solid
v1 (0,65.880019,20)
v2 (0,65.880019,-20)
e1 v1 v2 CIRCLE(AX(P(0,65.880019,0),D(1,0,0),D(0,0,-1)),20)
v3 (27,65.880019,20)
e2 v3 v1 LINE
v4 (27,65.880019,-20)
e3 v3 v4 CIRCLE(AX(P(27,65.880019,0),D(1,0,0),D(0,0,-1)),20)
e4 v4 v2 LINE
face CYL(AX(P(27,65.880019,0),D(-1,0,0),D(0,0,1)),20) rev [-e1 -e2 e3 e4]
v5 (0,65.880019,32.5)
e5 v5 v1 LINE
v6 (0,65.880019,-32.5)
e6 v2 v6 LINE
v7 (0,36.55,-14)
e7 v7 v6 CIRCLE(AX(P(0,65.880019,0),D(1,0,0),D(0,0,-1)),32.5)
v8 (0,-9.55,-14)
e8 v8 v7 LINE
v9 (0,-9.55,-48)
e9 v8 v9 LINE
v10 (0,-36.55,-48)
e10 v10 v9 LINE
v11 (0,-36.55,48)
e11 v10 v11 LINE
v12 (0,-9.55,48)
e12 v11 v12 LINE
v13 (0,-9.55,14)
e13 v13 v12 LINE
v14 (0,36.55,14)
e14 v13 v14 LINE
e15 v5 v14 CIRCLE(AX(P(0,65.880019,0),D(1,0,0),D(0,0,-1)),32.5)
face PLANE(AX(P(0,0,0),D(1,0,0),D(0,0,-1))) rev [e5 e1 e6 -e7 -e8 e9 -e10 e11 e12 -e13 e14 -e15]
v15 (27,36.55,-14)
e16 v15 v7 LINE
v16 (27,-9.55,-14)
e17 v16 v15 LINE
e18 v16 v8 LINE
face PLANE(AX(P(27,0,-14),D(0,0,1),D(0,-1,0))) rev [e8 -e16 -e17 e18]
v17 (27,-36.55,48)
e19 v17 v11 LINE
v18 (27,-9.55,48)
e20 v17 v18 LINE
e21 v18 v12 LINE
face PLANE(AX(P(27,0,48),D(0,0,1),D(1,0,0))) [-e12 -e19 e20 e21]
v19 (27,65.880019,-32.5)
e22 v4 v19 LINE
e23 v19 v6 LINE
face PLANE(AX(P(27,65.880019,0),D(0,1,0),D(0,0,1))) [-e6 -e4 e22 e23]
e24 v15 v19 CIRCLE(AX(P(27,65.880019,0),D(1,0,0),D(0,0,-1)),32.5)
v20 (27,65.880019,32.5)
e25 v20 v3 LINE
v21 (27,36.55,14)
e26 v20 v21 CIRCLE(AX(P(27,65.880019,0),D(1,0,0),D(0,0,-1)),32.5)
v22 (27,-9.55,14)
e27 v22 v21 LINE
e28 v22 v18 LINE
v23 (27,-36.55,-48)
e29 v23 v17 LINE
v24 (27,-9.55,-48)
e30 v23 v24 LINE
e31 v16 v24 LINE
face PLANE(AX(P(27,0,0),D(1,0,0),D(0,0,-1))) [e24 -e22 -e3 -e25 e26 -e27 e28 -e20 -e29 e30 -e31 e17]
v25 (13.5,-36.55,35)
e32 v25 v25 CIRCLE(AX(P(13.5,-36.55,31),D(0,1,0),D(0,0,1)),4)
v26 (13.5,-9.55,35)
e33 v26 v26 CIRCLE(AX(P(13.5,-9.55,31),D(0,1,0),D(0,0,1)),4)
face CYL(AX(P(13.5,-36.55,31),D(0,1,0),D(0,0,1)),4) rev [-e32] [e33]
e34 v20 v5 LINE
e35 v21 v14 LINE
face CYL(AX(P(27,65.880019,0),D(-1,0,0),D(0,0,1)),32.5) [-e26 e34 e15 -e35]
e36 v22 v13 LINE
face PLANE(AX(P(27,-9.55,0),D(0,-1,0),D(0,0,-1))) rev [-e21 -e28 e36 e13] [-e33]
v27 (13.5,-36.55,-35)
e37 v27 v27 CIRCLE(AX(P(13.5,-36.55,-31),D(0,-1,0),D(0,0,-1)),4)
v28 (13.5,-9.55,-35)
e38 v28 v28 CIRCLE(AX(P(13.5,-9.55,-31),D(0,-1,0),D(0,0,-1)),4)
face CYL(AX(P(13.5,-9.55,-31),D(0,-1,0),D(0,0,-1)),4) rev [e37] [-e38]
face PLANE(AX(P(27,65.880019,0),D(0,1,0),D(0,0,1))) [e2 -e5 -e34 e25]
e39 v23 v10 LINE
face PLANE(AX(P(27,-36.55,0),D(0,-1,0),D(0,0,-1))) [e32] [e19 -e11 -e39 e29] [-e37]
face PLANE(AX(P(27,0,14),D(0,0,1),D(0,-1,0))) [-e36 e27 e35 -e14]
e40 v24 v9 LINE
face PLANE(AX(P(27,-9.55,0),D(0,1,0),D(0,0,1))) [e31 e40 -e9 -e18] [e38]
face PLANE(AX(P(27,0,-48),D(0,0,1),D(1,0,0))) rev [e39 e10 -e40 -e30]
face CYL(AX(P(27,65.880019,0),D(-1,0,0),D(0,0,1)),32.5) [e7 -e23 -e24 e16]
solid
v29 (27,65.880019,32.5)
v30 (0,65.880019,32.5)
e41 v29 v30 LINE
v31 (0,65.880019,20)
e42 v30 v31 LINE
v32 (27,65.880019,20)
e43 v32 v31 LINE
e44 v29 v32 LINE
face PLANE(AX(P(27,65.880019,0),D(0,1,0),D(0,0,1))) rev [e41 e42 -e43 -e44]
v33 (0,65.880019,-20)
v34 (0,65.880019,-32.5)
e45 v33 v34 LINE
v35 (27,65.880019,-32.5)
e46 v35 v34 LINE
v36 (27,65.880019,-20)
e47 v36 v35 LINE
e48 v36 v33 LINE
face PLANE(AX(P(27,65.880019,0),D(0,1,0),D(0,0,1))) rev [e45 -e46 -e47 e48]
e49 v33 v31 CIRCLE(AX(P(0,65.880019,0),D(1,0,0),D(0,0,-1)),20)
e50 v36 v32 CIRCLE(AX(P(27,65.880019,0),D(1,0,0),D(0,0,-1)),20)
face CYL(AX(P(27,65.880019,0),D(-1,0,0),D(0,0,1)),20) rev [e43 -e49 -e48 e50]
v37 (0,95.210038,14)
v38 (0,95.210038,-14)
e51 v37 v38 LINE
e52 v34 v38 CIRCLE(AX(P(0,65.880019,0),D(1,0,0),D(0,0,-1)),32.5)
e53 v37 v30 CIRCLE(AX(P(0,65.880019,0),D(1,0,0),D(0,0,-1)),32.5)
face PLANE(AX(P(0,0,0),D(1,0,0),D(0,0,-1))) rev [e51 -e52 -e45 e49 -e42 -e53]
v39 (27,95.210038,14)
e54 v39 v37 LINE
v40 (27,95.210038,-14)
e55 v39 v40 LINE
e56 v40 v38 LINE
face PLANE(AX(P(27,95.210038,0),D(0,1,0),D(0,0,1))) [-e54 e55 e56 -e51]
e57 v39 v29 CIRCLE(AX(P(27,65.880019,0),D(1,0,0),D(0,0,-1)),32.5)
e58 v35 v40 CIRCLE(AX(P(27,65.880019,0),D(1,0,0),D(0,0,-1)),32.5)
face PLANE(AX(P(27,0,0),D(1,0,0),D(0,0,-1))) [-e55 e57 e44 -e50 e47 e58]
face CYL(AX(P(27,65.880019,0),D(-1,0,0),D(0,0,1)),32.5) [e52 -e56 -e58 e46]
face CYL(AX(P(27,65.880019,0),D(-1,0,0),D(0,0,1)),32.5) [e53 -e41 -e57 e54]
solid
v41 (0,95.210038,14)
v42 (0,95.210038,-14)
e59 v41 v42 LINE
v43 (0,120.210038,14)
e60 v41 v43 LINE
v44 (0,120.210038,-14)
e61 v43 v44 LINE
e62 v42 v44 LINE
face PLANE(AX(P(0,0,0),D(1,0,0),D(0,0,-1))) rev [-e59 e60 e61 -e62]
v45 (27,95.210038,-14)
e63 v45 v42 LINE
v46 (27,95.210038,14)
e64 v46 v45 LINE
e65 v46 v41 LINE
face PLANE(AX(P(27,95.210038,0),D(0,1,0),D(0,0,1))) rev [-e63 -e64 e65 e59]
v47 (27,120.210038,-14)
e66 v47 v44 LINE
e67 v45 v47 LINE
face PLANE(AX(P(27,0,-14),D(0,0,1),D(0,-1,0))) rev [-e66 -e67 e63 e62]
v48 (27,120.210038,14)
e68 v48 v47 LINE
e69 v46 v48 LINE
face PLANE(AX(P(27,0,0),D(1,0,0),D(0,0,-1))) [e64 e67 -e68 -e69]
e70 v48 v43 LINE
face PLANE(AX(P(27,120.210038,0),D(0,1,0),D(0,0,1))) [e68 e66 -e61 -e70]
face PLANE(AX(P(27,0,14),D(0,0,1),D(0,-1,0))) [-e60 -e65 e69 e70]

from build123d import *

# Parameters (mm, degrees)
SKETCH2_W              = 34
SKETCH2_H              = 27
SKETCH2_W_2            = 28
SKETCH2_H_2            = 73.1
BOSS_EXTRUDE1_DEPTH    = 27
CUT_EXTRUDE1_DEPTH     = 27
CUT_EXTRUDE2_START     = -36.55
CUT_EXTRUDE2_OUTLINE_R = 4
CUT_EXTRUDE2_DEPTH     = 27
BOSS_EXTRUDE3_DEPTH    = 27
SKETCH2_4_W            = 28
SKETCH2_4_H            = 25
BOSS_EXTRUDE4_DEPTH    = 27


# Read off the part's stored shape, not the designer's step: Cut-Extrude2
with BuildPart() as part:
    # Sketch2 → Boss-Extrude1 (new body)
    with BuildSketch(Plane(origin=(0, 0, 0), x_dir=(0, 0, -1), z_dir=(1, 0, 0))):
        with Locations((-31, -23.05)):
            Rectangle(SKETCH2_W, SKETCH2_H)
        Rectangle(SKETCH2_W_2, SKETCH2_H_2)
        with Locations((31, -23.05)):
            Rectangle(SKETCH2_W, SKETCH2_H)
        with BuildLine():
            ThreePointArc((-32.5, 65.880018752), (-27.488634015, 48.541477868), (-14, 36.55))
            Line((-14, 36.55), (14, 36.55))
            ThreePointArc((14, 36.55), (27.488634015, 48.541477868), (32.5, 65.880018752))
            Line((32.5, 65.880018752), (20, 65.880018752))
            ThreePointArc((20, 65.880018752), (0, 45.880018752), (-20, 65.880018752))
            Line((-20, 65.880018752), (-32.5, 65.880018752))
        make_face()
    extrude(amount=BOSS_EXTRUDE1_DEPTH)

    # Sketch3 → Cut-Extrude1 (cut)
    with BuildSketch(Plane(origin=(0, -9.55, 0), x_dir=(1, 0, 0), z_dir=(0, 1, 0))):
        with BuildLine():
            ThreePointArc((15.987528574, -27.86755661), (10.36755661, -28.512471426), (11.012471426, -34.13244339))
            Line((11.012471426, -34.13244339), (15.987528574, -27.86755661))
        make_face()
        with BuildLine():
            Line((15.987528574, -27.86755661), (11.012471426, -34.13244339))
            ThreePointArc((11.012471426, -34.13244339), (15.239236284, -34.602090664), (17.5, -31))
            ThreePointArc((17.5, -31), (17.102090664, -29.260763716), (15.987528574, -27.86755661))
        make_face()
    extrude(amount=-CUT_EXTRUDE1_DEPTH, mode=Mode.SUBTRACT)

    # Cut-Extrude2 outline → Cut-Extrude2 (cut)
    with BuildSketch(Plane(origin=(0, 0, 0), x_dir=(1, 0, 0), z_dir=(0, 1, 0)).offset(CUT_EXTRUDE2_START)):
        with Locations((13.5, 31)):
            Circle(CUT_EXTRUDE2_OUTLINE_R)
    extrude(amount=CUT_EXTRUDE2_DEPTH, mode=Mode.SUBTRACT)


with BuildPart() as body_2:
    # Sketch2<3> → Boss-Extrude3 (new body)
    with BuildSketch(Plane(origin=(0, 0, 0), x_dir=(0, 0, -1), z_dir=(1, 0, 0))):
        with BuildLine():
            ThreePointArc((-14, 95.210037504), (-27.488634015, 83.218559637), (-32.5, 65.880018752))
            Line((-32.5, 65.880018752), (-20, 65.880018752))
            ThreePointArc((-20, 65.880018752), (0, 85.880018752), (20, 65.880018752))
            Line((20, 65.880018752), (32.5, 65.880018752))
            ThreePointArc((32.5, 65.880018752), (27.488634015, 83.218559637), (14, 95.210037504))
            Line((14, 95.210037504), (-14, 95.210037504))
        make_face()
    extrude(amount=BOSS_EXTRUDE3_DEPTH)


with BuildPart() as body_3:
    # Sketch2<4> → Boss-Extrude4 (new body)
    with BuildSketch(Plane(origin=(0, 0, 0), x_dir=(0, 0, -1), z_dir=(1, 0, 0))):
        with Locations((0, 107.710037504)):
            Rectangle(SKETCH2_4_W, SKETCH2_4_H)
    extrude(amount=BOSS_EXTRUDE4_DEPTH)


solid = Compound([part.part, body_2.part, body_3.part])
